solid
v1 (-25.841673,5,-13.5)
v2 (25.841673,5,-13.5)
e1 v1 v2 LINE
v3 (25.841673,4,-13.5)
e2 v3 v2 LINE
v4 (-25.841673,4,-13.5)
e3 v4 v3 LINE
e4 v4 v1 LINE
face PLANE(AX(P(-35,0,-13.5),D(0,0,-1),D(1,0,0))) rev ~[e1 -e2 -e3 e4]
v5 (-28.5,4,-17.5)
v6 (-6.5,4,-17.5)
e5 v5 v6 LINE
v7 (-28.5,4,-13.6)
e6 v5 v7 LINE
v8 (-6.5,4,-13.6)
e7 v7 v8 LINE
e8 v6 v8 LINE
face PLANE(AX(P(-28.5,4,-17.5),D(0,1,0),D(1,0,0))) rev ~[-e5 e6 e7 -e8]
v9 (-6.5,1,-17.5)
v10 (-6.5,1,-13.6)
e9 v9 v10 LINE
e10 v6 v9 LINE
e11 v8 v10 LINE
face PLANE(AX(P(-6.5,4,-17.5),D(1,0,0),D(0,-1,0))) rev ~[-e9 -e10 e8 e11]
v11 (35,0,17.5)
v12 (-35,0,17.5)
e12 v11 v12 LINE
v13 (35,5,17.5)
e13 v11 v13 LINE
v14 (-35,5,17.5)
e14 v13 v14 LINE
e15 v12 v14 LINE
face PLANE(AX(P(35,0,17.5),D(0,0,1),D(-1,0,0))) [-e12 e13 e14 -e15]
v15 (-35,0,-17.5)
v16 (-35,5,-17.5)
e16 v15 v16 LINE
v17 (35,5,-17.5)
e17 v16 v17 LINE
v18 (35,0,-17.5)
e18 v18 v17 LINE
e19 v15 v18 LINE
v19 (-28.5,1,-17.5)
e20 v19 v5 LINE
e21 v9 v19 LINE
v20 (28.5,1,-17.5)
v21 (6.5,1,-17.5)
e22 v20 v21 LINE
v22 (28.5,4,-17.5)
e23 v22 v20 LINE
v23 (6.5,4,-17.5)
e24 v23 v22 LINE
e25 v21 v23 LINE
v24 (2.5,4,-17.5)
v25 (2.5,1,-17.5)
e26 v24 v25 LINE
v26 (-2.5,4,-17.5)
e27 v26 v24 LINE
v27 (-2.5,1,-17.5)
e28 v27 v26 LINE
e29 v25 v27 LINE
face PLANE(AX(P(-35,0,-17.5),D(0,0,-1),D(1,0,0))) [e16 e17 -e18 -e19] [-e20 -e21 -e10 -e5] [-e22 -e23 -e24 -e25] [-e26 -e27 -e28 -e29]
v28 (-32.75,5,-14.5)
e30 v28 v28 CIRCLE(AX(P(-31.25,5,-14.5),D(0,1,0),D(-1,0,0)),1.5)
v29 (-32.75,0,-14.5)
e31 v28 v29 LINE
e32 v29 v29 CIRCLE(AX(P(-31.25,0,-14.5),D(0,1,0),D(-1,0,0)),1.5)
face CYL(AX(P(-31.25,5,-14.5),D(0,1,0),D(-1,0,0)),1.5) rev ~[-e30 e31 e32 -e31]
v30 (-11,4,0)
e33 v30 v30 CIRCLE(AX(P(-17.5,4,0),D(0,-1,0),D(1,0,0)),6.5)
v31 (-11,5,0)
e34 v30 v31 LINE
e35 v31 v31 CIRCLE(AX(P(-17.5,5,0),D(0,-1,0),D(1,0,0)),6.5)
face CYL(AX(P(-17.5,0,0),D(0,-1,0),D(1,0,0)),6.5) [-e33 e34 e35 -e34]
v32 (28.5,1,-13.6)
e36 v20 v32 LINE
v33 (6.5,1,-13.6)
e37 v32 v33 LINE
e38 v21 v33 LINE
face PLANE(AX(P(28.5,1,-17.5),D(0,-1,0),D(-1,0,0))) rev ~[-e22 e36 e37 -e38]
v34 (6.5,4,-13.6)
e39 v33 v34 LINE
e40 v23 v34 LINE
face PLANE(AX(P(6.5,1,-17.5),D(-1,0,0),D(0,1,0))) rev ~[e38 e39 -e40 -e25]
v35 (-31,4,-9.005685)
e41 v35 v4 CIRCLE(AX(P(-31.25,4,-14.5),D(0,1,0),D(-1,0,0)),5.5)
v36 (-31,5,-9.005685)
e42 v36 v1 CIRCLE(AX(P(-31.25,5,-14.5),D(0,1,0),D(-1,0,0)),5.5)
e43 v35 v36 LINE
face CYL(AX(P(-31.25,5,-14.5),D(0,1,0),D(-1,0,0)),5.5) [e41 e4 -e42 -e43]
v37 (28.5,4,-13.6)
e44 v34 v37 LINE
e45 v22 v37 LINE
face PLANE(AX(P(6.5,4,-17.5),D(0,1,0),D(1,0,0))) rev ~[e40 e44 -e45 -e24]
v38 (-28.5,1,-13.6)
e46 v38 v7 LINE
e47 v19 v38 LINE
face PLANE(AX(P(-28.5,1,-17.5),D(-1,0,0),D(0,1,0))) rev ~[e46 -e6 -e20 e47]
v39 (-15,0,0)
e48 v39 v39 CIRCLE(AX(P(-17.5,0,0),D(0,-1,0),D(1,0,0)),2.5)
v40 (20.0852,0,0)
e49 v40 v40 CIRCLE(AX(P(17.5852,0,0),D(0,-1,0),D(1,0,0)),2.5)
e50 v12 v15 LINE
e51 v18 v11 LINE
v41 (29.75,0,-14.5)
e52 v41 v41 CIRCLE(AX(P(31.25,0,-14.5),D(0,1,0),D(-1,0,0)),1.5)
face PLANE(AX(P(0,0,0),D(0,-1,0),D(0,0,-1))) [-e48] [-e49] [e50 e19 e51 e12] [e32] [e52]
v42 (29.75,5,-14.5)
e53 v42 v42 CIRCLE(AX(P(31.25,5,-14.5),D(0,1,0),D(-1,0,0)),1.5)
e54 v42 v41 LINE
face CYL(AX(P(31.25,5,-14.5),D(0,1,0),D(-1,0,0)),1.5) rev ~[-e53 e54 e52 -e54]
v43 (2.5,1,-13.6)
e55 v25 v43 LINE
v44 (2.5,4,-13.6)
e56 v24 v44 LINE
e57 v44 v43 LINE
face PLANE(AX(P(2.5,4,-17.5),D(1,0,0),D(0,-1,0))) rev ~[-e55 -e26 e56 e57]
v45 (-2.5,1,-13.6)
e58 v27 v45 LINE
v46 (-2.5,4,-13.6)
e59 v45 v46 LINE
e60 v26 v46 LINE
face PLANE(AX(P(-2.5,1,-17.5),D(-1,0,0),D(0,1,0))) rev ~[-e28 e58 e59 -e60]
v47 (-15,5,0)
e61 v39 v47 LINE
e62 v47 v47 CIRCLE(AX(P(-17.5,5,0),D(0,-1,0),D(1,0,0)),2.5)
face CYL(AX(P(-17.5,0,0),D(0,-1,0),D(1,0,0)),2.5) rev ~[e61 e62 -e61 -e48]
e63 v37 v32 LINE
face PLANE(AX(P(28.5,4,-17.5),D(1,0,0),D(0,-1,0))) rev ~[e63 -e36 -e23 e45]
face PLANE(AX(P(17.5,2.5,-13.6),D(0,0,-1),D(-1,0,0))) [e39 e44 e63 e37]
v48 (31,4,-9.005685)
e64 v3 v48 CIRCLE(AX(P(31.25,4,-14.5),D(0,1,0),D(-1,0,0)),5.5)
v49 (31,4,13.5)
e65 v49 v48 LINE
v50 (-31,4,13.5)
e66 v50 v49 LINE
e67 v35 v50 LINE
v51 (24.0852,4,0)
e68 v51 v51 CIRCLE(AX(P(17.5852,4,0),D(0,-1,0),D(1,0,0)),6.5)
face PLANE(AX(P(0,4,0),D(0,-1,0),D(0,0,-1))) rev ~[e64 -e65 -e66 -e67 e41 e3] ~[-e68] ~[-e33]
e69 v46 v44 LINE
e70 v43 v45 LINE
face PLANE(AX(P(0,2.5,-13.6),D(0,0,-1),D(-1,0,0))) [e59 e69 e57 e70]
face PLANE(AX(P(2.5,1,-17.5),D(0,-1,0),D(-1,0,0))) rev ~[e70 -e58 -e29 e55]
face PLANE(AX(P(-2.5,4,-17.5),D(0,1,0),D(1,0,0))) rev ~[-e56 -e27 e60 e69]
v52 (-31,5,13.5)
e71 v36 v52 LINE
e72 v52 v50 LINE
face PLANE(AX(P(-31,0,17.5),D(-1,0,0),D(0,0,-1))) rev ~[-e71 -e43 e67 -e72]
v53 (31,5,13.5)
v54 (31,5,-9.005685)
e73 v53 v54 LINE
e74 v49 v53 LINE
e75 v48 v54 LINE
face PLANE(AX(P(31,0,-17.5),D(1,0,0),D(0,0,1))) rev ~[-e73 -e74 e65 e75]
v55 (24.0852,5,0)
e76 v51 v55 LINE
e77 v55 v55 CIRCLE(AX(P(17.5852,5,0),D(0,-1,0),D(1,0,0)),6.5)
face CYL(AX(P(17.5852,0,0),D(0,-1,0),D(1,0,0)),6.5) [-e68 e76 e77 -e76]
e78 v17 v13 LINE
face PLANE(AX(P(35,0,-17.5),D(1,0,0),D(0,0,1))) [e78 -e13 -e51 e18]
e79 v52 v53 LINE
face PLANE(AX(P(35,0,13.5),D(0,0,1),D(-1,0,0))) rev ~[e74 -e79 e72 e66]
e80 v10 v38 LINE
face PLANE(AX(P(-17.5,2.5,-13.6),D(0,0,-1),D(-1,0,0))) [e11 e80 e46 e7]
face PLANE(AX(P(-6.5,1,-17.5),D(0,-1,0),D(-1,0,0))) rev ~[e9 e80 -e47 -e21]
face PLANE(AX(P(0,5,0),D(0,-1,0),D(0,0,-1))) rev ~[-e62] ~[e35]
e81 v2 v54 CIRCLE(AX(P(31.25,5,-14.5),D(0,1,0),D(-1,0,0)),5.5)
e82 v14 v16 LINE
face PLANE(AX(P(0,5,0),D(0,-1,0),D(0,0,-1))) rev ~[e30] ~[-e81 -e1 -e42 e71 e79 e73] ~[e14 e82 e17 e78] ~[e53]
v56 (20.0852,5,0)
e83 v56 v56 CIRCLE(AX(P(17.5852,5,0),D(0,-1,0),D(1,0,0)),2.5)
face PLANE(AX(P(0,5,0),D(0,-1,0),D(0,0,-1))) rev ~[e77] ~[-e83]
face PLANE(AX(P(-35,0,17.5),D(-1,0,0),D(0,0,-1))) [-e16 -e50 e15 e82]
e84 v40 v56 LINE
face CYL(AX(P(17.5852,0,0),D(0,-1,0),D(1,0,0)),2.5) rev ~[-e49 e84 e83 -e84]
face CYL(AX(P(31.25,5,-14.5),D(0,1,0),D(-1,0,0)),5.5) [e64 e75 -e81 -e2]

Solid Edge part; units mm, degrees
sketch "Sketch1" plane through (0, 0, 0) normal (0, -1, 0) x (1, 0, 0)
  line L0 (35, 17.5) -> (-35, 17.5)
  line L1 (-35, 17.5) -> (-35, -17.5)
  line L2 (-35, -17.5) -> (35, -17.5)
  line L3 (35, -17.5) -> (35, 17.5)
extrude "Protrusion1" add sketch "Sketch1" against normal blind 5
sketch "Sketch2" plane through (0, 0, 0) normal (0, -1, 0) x (1, 0, 0)
  circle A0 centre (17.5852, 0) radius 2.5
extrude "ExtrudedCutout_1" cut sketch "Sketch2" against normal blind 7
sketch "Sketch3" plane through (0, 0, 0) normal (0, -1, 0) x (1, 0, 0)
  circle A0 centre (-17.5, 0) radius 2.5
extrude "ExtrudedCutout_2" cut sketch "Sketch3" against normal blind 7
sketch "Sketch4" plane through (0, 5, 0) normal (0, 1, 0) x (-1, 0, 0)
  circle A0 centre (-31.25, -14.5) radius 1.5
extrude "ExtrudedCutout_10" cut sketch "Sketch4" against normal blind 7
sketch "Sketch5" plane through (0, 5, 0) normal (0, 1, 0) x (-1, 0, 0)
  circle A0 centre (31.25, -14.5) radius 1.5
extrude "ExtrudedCutout_11" cut sketch "Sketch5" against normal blind 7
shell "Thinwall_4" thickness 4 removed faces 1 at (-22.6333, 5, 12.0167)
sketch "Sketch6" plane through (0, 2.5, -17.5) normal (0, 0, -1) x (-1, 0, 0)
  line L0 (-6.5, 1.5) -> (-28.5, 1.5)
  line L1 (-28.5, 1.5) -> (-28.5, -1.5)
  line L2 (-28.5, -1.5) -> (-6.5, -1.5)
  line L3 (-6.5, -1.5) -> (-6.5, 1.5)
extrude "ExtrudedCutout_13" cut sketch "Sketch6" against normal blind 3.9
sketch "Sketch7" plane through (0, 2.5, -17.5) normal (0, 0, -1) x (-1, 0, 0)
  line L0 (2.5, 1.5) -> (-2.5, 1.5)
  line L1 (-2.5, 1.5) -> (-2.5, -1.5)
  line L2 (-2.5, -1.5) -> (2.5, -1.5)
  line L3 (2.5, -1.5) -> (2.5, 1.5)
extrude "ExtrudedCutout_14" cut sketch "Sketch7" against normal blind 3.9
sketch "Sketch8" plane through (0, 2.5, -17.5) normal (0, 0, -1) x (-1, 0, 0)
  line L0 (28.5, 1.5) -> (6.5, 1.5)
  line L1 (6.5, 1.5) -> (6.5, -1.5)
  line L2 (6.5, -1.5) -> (28.5, -1.5)
  line L3 (28.5, -1.5) -> (28.5, 1.5)
extrude "ExtrudedCutout_15" cut sketch "Sketch8" against normal blind 3.9
